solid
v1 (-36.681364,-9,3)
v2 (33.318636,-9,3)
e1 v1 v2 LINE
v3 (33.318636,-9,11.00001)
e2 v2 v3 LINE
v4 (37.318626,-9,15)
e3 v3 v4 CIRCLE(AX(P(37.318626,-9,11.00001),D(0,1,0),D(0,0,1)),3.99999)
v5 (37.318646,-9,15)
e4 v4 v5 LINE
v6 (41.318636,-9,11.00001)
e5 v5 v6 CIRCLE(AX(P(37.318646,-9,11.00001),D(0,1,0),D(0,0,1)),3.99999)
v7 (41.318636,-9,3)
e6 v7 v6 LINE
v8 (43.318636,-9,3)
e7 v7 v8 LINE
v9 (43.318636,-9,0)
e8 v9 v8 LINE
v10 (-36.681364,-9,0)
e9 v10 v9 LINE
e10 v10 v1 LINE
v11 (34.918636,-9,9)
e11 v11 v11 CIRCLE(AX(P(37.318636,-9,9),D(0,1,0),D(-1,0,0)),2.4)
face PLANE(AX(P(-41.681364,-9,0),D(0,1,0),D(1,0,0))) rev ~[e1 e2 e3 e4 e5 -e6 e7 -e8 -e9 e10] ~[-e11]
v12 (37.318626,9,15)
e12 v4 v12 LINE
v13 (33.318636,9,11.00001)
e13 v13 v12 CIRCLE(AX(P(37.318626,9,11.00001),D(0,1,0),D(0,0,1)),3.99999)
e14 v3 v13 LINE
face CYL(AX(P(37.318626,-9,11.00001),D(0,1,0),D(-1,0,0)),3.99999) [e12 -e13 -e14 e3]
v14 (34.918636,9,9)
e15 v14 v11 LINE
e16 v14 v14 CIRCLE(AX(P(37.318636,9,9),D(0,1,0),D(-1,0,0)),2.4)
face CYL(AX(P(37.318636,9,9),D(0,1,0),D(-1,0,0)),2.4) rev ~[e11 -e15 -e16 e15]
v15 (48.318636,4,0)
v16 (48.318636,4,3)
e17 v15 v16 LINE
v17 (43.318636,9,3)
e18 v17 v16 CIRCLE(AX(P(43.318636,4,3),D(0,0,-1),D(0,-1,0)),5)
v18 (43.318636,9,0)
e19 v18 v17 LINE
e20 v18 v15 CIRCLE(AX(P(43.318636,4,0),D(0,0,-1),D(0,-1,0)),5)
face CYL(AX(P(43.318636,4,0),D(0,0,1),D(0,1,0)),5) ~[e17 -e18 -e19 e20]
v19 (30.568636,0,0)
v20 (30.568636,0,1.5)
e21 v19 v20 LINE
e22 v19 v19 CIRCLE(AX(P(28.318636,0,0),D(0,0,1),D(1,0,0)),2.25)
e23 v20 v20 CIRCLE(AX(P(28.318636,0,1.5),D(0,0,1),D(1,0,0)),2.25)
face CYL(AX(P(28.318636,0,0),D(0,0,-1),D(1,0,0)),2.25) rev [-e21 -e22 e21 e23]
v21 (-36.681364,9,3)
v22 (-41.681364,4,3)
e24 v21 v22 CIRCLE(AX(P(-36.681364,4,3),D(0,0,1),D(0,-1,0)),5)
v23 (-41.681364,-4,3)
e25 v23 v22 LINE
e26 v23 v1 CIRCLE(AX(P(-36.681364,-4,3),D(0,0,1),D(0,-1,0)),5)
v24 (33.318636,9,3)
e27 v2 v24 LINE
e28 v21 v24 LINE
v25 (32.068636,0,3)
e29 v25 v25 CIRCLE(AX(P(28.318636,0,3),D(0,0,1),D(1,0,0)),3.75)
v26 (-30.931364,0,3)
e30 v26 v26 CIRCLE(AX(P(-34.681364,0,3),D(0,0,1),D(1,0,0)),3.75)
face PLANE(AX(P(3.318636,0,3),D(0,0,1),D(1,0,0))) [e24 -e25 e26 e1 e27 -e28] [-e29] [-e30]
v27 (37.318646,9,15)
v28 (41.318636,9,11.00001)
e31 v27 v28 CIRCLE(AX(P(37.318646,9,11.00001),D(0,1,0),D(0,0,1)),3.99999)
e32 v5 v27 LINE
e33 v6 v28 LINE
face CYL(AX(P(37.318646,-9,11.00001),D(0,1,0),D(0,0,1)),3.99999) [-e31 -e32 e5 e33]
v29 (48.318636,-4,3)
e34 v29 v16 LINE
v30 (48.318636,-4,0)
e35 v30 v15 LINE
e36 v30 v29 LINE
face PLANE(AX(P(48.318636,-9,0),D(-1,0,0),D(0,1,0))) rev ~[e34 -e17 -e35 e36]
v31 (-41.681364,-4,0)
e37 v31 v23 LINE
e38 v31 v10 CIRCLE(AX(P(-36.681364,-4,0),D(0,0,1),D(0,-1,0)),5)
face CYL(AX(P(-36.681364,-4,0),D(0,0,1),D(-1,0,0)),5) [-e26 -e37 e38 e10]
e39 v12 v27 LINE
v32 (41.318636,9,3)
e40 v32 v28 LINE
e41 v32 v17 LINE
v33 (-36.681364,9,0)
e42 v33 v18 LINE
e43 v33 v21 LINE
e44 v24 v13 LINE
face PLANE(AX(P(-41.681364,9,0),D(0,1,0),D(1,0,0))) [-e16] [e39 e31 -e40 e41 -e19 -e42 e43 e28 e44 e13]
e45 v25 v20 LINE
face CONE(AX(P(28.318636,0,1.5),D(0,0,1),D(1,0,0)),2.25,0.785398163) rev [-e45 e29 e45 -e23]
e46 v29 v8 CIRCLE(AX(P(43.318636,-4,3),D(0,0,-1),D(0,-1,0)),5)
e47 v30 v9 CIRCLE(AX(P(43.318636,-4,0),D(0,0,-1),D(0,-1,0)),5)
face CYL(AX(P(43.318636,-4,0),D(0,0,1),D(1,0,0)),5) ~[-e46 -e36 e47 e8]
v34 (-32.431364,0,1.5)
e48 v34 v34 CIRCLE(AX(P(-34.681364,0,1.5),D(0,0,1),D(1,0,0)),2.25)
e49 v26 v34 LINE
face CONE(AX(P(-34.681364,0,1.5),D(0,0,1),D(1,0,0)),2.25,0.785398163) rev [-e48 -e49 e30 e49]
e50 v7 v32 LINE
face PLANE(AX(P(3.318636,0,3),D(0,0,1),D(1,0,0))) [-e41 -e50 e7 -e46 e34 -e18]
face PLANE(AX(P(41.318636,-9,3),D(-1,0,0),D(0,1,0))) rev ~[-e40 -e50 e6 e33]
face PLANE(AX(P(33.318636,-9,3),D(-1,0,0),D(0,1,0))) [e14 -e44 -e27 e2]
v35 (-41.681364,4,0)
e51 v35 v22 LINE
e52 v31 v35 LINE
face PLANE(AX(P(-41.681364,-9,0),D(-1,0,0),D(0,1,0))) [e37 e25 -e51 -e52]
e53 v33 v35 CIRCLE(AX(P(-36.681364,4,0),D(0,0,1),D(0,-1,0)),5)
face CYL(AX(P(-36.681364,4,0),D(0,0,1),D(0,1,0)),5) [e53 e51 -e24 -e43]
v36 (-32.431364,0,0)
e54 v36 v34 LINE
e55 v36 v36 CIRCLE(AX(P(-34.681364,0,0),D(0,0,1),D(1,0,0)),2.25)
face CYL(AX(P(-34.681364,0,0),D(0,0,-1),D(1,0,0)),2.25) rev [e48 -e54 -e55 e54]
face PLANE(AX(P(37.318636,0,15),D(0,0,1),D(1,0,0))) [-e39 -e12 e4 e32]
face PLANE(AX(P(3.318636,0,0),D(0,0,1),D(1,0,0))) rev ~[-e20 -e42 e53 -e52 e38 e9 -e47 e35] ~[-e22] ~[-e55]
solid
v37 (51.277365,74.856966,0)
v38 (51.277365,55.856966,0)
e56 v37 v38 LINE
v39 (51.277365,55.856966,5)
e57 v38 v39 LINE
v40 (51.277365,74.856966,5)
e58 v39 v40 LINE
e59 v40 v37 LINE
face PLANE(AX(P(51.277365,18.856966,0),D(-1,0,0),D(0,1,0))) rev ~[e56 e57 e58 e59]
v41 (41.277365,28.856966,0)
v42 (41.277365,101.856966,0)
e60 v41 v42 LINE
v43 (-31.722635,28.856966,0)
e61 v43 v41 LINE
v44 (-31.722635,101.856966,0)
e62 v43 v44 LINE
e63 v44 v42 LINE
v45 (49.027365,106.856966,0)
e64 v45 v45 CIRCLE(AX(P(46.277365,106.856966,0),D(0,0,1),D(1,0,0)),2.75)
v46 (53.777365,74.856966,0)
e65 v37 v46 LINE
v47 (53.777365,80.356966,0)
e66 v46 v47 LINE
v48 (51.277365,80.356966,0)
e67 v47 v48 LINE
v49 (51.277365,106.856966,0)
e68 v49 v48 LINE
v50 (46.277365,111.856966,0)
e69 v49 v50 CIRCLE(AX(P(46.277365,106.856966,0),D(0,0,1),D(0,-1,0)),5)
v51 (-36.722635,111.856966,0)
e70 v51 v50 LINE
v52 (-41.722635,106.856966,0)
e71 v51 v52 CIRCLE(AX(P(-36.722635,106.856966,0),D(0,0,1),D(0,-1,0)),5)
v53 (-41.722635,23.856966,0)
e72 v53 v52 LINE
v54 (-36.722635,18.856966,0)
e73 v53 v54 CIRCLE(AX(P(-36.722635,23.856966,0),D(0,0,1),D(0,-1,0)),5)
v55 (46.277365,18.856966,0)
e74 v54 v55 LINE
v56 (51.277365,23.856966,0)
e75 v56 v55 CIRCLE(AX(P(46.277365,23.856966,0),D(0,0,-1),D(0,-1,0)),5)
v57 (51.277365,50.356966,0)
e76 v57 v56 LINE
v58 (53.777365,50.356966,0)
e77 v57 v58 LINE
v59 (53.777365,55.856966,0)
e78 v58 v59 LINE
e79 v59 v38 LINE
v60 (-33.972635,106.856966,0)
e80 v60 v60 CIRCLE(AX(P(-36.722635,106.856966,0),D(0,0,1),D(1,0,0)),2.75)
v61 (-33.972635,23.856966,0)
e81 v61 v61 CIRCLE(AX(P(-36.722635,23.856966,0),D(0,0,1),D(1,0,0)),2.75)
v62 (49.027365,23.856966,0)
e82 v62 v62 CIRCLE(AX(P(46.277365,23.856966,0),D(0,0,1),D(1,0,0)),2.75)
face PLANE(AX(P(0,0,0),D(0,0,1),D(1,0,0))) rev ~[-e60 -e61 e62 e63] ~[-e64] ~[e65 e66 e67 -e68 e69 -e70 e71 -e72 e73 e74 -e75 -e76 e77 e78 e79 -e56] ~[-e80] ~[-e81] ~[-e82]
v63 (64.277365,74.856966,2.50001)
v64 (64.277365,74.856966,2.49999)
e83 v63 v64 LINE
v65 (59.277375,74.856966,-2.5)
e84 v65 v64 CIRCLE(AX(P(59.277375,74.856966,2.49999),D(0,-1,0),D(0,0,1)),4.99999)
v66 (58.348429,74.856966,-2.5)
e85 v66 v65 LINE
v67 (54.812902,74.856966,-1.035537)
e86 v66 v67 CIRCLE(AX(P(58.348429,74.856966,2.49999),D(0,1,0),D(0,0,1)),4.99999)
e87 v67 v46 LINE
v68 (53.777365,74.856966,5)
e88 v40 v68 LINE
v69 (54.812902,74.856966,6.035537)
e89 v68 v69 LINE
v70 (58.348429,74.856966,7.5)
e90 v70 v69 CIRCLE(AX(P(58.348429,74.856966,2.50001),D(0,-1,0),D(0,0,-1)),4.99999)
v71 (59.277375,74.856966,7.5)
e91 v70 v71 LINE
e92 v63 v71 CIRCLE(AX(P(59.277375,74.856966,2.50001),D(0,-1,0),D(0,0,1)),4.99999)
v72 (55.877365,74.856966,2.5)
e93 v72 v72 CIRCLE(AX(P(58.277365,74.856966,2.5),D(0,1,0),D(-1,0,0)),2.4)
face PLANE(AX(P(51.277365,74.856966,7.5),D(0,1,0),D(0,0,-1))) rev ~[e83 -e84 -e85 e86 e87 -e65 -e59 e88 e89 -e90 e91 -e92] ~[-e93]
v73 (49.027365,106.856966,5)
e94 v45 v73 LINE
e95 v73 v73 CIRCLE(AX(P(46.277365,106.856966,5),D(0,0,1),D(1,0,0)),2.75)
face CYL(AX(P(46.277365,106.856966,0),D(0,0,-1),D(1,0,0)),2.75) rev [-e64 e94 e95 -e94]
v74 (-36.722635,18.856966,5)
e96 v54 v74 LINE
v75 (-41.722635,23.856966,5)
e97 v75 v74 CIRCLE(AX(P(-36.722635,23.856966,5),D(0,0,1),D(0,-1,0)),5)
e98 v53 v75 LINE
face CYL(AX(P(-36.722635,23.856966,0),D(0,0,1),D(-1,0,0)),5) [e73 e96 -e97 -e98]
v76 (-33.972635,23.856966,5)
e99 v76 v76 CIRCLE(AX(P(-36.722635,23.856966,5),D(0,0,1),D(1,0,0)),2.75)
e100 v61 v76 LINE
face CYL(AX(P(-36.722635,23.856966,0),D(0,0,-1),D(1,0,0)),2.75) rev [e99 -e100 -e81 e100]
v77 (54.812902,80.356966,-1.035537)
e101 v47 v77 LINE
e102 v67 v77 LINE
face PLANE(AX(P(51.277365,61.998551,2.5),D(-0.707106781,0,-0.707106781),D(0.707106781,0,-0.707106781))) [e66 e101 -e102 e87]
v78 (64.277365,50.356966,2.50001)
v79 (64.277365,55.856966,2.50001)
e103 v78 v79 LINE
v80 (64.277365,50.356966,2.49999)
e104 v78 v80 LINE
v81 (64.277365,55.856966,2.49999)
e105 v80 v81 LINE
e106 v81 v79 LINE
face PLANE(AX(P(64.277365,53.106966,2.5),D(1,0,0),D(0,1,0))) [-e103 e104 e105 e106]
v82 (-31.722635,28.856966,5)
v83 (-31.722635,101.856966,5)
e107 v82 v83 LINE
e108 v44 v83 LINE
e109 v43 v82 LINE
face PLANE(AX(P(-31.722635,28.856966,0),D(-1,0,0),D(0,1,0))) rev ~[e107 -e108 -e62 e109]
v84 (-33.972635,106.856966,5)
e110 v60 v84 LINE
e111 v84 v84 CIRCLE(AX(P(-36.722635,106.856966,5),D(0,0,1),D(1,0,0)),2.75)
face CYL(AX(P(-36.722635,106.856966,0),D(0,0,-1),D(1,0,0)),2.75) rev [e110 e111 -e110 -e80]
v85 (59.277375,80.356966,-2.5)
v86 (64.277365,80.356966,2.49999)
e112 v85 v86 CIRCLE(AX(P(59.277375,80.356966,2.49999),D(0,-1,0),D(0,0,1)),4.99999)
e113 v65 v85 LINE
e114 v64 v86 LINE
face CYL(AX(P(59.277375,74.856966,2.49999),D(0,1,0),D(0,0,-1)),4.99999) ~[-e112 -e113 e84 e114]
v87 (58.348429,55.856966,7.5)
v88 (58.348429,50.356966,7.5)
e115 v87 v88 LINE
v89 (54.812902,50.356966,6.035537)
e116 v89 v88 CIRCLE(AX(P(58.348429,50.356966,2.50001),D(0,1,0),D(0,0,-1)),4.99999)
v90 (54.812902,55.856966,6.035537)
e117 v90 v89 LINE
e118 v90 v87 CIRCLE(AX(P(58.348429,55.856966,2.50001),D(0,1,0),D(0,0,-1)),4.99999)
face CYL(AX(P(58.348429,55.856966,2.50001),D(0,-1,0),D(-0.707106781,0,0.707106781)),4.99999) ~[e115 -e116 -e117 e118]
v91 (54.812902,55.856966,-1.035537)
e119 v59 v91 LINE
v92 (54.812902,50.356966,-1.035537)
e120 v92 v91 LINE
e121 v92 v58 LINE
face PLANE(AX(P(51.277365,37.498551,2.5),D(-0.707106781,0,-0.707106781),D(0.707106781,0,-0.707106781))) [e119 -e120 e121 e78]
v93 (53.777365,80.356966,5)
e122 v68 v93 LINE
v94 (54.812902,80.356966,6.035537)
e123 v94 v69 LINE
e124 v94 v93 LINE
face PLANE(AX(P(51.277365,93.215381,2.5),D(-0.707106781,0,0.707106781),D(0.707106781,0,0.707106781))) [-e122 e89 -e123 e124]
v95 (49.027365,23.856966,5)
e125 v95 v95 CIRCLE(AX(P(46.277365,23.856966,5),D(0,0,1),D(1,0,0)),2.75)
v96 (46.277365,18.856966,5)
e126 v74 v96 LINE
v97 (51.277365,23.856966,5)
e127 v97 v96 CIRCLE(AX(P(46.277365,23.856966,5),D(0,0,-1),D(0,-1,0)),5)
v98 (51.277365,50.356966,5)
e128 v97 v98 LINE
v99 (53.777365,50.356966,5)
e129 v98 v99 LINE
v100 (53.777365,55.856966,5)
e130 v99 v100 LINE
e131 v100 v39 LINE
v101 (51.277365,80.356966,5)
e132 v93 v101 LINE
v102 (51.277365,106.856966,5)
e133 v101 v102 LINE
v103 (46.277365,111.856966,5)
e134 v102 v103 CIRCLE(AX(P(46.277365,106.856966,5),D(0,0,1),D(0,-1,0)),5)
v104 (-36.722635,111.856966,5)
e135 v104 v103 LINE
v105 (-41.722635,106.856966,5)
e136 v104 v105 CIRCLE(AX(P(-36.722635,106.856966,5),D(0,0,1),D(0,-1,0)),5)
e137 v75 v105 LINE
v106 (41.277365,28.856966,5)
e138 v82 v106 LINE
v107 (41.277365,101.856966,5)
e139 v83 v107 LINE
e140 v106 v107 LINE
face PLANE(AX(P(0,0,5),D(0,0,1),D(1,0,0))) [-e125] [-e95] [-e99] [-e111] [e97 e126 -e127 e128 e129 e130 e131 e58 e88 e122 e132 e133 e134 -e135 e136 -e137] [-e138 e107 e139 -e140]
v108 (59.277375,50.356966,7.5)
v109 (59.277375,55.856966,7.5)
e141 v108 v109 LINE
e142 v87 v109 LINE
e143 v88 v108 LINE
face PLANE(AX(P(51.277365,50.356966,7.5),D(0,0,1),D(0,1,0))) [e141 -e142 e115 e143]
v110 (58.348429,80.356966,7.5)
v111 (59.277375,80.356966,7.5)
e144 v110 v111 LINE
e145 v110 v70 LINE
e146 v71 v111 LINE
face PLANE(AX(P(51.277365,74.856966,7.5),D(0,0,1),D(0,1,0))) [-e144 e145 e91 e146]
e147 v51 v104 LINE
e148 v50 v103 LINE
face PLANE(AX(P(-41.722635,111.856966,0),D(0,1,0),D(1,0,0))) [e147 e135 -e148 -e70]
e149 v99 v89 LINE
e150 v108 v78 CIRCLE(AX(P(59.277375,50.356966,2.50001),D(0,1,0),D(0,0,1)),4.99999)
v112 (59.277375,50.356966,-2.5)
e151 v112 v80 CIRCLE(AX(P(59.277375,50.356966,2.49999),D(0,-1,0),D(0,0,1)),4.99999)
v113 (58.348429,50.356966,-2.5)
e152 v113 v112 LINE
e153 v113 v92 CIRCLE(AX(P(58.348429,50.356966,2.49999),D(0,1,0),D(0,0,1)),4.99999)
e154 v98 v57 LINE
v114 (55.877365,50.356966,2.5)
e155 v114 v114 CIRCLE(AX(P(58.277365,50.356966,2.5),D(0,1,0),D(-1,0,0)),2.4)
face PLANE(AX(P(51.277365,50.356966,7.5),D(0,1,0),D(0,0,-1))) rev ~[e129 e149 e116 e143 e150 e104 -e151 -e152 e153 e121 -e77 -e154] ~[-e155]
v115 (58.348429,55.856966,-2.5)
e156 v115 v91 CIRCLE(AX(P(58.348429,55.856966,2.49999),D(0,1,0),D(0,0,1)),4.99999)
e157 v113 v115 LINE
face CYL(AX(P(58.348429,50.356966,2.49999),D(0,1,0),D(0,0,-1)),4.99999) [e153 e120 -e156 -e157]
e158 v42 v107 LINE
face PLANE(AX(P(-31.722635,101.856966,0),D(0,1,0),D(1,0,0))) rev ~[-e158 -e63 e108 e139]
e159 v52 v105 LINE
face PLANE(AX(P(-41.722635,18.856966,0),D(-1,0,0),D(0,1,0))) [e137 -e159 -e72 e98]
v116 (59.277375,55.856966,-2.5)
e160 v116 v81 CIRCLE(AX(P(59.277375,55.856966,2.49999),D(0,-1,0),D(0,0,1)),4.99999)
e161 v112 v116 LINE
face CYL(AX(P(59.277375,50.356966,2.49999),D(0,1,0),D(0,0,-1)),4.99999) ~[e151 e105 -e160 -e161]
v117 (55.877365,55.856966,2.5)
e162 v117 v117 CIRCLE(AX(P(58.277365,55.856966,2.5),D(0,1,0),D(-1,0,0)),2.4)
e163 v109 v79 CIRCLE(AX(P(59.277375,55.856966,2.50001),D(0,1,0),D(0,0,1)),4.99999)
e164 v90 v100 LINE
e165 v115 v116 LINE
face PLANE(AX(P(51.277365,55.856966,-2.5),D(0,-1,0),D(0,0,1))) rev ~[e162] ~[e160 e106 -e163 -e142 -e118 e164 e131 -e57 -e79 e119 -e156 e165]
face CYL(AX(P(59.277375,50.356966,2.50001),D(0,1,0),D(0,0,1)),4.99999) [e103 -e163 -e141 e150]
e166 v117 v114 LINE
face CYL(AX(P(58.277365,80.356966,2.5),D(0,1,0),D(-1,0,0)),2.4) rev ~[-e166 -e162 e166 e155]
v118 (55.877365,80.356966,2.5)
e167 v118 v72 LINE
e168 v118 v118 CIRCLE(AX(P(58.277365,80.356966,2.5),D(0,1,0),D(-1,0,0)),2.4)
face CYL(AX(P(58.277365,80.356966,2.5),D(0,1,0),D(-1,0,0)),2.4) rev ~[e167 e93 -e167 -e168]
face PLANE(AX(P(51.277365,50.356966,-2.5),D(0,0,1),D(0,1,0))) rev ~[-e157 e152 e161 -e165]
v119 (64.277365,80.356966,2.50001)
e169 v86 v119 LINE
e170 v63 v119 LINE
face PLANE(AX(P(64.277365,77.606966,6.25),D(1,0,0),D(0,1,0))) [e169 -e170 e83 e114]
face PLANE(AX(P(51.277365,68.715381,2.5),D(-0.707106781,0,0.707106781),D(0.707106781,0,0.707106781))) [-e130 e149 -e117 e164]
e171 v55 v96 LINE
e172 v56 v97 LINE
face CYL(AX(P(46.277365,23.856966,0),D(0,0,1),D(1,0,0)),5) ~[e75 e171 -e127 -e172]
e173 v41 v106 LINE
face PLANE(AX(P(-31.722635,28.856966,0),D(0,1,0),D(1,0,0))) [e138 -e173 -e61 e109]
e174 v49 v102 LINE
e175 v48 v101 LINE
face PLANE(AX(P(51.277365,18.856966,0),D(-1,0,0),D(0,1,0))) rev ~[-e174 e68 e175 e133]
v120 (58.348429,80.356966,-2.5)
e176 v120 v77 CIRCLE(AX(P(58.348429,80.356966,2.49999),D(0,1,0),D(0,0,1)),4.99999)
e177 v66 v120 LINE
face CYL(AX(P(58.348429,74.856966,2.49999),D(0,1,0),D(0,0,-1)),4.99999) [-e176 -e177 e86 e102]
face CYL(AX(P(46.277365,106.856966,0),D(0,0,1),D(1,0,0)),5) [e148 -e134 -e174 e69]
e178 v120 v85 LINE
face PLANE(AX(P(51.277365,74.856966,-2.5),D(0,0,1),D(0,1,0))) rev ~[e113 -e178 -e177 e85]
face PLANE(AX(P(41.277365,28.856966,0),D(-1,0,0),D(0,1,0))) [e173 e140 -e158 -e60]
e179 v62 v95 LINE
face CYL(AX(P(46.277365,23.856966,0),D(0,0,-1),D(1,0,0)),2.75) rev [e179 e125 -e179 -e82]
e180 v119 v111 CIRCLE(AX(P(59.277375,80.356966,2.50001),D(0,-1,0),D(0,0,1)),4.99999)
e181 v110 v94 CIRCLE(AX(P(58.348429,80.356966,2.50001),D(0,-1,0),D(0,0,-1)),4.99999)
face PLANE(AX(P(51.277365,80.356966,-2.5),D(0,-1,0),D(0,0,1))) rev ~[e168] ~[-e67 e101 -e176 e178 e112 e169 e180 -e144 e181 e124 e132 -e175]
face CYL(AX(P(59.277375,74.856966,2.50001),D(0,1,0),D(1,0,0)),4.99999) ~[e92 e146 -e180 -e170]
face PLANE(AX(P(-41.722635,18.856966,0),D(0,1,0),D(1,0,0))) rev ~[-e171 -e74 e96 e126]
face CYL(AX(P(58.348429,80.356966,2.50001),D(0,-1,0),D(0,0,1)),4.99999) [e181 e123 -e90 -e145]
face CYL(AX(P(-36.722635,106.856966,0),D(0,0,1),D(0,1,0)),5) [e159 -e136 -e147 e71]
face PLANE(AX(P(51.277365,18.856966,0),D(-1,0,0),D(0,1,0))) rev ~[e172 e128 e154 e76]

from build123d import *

# Parameters (mm, degrees)
F0_W          = 90
F0_H          = 18
F0_R          = 2.25
F1_DEPTH      = 3
F2_W          = 8
F2_H          = 18
F3_DEPTH      = 12
F4_R          = 2.4
F5_DEPTH      = 18
F6_SIZE       = 1.5
F7_W          = 93
F7_H          = 93
F7_R          = 2.75
F7_W_2        = 73
F7_H_2        = 73
F8_DEPTH      = 5
F9_W          = 5.5
F9_H          = 5
F9_H_2        = 2.5
F10_DEPTH     = 13
F11_R         = 2.4
F12_DEPTH     = 89.3579660494
F13_T4_DEPTH  = 31.2168298797
F13_T9_DEPTH  = 31.2168298797
F13_T14_DEPTH = 31.2168298797
F13_T19_DEPTH = 31.2168298797
F14_R         = 4.99999
F15_R         = 5
F16_R         = 3.99999
F17_R         = 5


# Not quite as in the source:
# - a fillet or chamfer that OpenCascade refuses, or shapes differently, is made with other operations: its cross-section is extruded or revolved along the edge and cut away or added
# - a fillet or chamfer is up to 0.001 mm smaller than in the source, because OpenCascade refuses the exact size


with BuildPart() as f1:
    # F0 (on Top) → F1 (new body)
    with BuildSketch(Plane.XY):
        with Locations((3.3186358213, 0)):
            Rectangle(F0_W, F0_H)
        with Locations((-34.6813641787, 0)):
            Circle(F0_R, mode=Mode.SUBTRACT)
        with Locations((28.3186358213, 0)):
            Circle(F0_R, mode=Mode.SUBTRACT)
    extrude(amount=F1_DEPTH)

    # F2 (on face) → F3 (join)
    with BuildSketch(Plane.XY.offset(3)):
        with Locations((37.3186358213, 0)):
            Rectangle(F2_W, F2_H)
    extrude(amount=F3_DEPTH)

    # F4 (on face) → F5 (cut, through all)
    with BuildSketch(Plane(origin=(0, 9, 0), x_dir=(-1, 0, 0), z_dir=(0, 1, 0))):
        with Locations((-37.3186358213, 9)):
            Circle(F4_R)
    extrude(amount=-F5_DEPTH, mode=Mode.SUBTRACT)

    # F6
    f6_edges = [f1.edges().sort_by_distance(p)[0] for p in [
        (-36.931364, 0, 3),
        (26.068636, 0, 3),
    ]]
    chamfer(f6_edges, length=F6_SIZE)

    # F16 (radius 4 in the source; OpenCascade refuses exactly that, so slightly less here)
    f16_edges = [f1.edges().sort_by_distance(p)[0] for p in [
        (41.318636, 0, 15),
        (33.318636, 0, 15),
    ]]
    fillet(f16_edges, radius=F16_R)

    # F17
    f17_edges = [f1.edges().sort_by_distance(p)[0] for p in [
        (-41.681364, -9, 1.5),
        (-41.681364, 9, 1.5),
        (48.318636, -9, 1.5),
        (48.318636, 9, 1.5),
    ]]
    fillet(f17_edges, radius=F17_R)


with BuildPart() as f8:
    # F7 (on Top) → F8 (new body)
    with BuildSketch(Plane.XY):
        with Locations((4.7773654461, 65.3569660494)):
            Rectangle(F7_W, F7_H)
        with Locations((-36.7226345539, 23.8569660494)):
            Circle(F7_R, mode=Mode.SUBTRACT)
        with Locations((46.2773654461, 23.8569660494)):
            Circle(F7_R, mode=Mode.SUBTRACT)
        with Locations((4.7773654461, 65.3569660494)):
            Rectangle(F7_W_2, F7_H_2, mode=Mode.SUBTRACT)
        with Locations((-36.7226345539, 106.8569660494)):
            Circle(F7_R, mode=Mode.SUBTRACT)
        with Locations((46.2773654461, 106.8569660494)):
            Circle(F7_R, mode=Mode.SUBTRACT)
    extrude(amount=F8_DEPTH)

    # F9 (on face) → F10 (join)
    with BuildSketch(Plane.YZ.offset(51.2773654461)):
        with Locations((53.1069660494, 2.5)):
            Rectangle(F9_W, F9_H)
        with Locations((53.1069660494, -1.25)):
            Rectangle(F9_W, F9_H_2)
        with Locations((77.6069660494, 6.25)):
            Rectangle(F9_W, F9_H_2)
        with Locations((77.6069660494, -1.25)):
            Rectangle(F9_W, F9_H_2)
        with Locations((77.6069660494, 2.5)):
            Rectangle(F9_W, F9_H)
        with Locations((53.1069660494, 6.25)):
            Rectangle(F9_W, F9_H_2)
    extrude(amount=F10_DEPTH)

    # F11 (on face) → F12 (cut, through all)
    with BuildSketch(Plane(origin=(0, 80.3569660494, 0), x_dir=(-1, 0, 0), z_dir=(0, 1, 0))):
        with Locations((-58.2773654461, 2.5)):
            Circle(F11_R)
    extrude(amount=-F12_DEPTH, mode=Mode.SUBTRACT)

    # F13: chamfer of 5 on 4 edges, made by hand


with BuildPart() as f13_tool2:
    # F13_s3 → F13_t4 (new body)
    with BuildSketch(Plane.XZ.offset(-68.7153809892)):
        Polygon((51.2773654461, 2.5), (56.2773654461, 7.5), (51.2773654461, 7.5), align=None)
    extrude(amount=F13_T4_DEPTH)

    split(bisect_by=Plane.XY.offset(5), keep=Keep.TOP)


with BuildPart() as f8_1:
    add(f8.part)

    # F13_t1: cut F13_tool2
    add(f13_tool2.part, mode=Mode.SUBTRACT)


with BuildPart() as f13_tool7:
    # F13_s8 → F13_t9 (new body)
    with BuildSketch(Plane.XZ.offset(-93.2153809892)):
        Polygon((51.2773654461, 2.5), (56.2773654461, 7.5), (51.2773654461, 7.5), align=None)
    extrude(amount=F13_T9_DEPTH)

    split(bisect_by=Plane.XY.offset(5), keep=Keep.TOP)


with BuildPart() as f8_2:
    add(f8_1.part)

    # F13_t6: cut F13_tool7
    add(f13_tool7.part, mode=Mode.SUBTRACT)


with BuildPart() as f13_tool12:
    # F13_s13 → F13_t14 (new body)
    with BuildSketch(Plane.XZ.offset(-37.4985511096)):
        Polygon((51.2773654461, 2.5), (56.2773654461, -2.5), (51.2773654461, -2.5), align=None)
    extrude(amount=-F13_T14_DEPTH)

    split(bisect_by=Plane.XY, keep=Keep.BOTTOM)


with BuildPart() as f8_3:
    add(f8_2.part)

    # F13_t11: cut F13_tool12
    add(f13_tool12.part, mode=Mode.SUBTRACT)


with BuildPart() as f13_tool17:
    # F13_s18 → F13_t19 (new body)
    with BuildSketch(Plane.XZ.offset(-61.9985511096)):
        Polygon((51.2773654461, 2.5), (56.2773654461, -2.5), (51.2773654461, -2.5), align=None)
    extrude(amount=-F13_T19_DEPTH)

    split(bisect_by=Plane.XY, keep=Keep.BOTTOM)


with BuildPart() as f8_4:
    add(f8_3.part)

    # F13_t16: cut F13_tool17
    add(f13_tool17.part, mode=Mode.SUBTRACT)

    # F14 (radius 5 in the source; OpenCascade refuses exactly that, so slightly less here)
    f14_edges = [f8_4.edges().sort_by_distance(p)[0] for p in [
        (64.277365, 53.106966, 7.5),
        (64.277365, 77.606966, 7.5),
        (64.277365, 77.606966, -2.5),
        (64.277365, 53.106966, -2.5),
        (56.277365, 53.106966, 7.5),
        (56.277365, 53.106966, -2.5),
        (56.277365, 77.606966, -2.5),
        (56.277365, 77.606966, 7.5),
    ]]
    fillet(f14_edges, radius=F14_R)

    # F15
    f15_edges = [f8_4.edges().sort_by_distance(p)[0] for p in [
        (51.277365, 18.856966, 2.5),
        (51.277365, 111.856966, 2.5),
        (-41.722635, 111.856966, 2.5),
        (-41.722635, 18.856966, 2.5),
    ]]
    fillet(f15_edges, radius=F15_R)


solid = Compound([f1.part, f8_4.part])
